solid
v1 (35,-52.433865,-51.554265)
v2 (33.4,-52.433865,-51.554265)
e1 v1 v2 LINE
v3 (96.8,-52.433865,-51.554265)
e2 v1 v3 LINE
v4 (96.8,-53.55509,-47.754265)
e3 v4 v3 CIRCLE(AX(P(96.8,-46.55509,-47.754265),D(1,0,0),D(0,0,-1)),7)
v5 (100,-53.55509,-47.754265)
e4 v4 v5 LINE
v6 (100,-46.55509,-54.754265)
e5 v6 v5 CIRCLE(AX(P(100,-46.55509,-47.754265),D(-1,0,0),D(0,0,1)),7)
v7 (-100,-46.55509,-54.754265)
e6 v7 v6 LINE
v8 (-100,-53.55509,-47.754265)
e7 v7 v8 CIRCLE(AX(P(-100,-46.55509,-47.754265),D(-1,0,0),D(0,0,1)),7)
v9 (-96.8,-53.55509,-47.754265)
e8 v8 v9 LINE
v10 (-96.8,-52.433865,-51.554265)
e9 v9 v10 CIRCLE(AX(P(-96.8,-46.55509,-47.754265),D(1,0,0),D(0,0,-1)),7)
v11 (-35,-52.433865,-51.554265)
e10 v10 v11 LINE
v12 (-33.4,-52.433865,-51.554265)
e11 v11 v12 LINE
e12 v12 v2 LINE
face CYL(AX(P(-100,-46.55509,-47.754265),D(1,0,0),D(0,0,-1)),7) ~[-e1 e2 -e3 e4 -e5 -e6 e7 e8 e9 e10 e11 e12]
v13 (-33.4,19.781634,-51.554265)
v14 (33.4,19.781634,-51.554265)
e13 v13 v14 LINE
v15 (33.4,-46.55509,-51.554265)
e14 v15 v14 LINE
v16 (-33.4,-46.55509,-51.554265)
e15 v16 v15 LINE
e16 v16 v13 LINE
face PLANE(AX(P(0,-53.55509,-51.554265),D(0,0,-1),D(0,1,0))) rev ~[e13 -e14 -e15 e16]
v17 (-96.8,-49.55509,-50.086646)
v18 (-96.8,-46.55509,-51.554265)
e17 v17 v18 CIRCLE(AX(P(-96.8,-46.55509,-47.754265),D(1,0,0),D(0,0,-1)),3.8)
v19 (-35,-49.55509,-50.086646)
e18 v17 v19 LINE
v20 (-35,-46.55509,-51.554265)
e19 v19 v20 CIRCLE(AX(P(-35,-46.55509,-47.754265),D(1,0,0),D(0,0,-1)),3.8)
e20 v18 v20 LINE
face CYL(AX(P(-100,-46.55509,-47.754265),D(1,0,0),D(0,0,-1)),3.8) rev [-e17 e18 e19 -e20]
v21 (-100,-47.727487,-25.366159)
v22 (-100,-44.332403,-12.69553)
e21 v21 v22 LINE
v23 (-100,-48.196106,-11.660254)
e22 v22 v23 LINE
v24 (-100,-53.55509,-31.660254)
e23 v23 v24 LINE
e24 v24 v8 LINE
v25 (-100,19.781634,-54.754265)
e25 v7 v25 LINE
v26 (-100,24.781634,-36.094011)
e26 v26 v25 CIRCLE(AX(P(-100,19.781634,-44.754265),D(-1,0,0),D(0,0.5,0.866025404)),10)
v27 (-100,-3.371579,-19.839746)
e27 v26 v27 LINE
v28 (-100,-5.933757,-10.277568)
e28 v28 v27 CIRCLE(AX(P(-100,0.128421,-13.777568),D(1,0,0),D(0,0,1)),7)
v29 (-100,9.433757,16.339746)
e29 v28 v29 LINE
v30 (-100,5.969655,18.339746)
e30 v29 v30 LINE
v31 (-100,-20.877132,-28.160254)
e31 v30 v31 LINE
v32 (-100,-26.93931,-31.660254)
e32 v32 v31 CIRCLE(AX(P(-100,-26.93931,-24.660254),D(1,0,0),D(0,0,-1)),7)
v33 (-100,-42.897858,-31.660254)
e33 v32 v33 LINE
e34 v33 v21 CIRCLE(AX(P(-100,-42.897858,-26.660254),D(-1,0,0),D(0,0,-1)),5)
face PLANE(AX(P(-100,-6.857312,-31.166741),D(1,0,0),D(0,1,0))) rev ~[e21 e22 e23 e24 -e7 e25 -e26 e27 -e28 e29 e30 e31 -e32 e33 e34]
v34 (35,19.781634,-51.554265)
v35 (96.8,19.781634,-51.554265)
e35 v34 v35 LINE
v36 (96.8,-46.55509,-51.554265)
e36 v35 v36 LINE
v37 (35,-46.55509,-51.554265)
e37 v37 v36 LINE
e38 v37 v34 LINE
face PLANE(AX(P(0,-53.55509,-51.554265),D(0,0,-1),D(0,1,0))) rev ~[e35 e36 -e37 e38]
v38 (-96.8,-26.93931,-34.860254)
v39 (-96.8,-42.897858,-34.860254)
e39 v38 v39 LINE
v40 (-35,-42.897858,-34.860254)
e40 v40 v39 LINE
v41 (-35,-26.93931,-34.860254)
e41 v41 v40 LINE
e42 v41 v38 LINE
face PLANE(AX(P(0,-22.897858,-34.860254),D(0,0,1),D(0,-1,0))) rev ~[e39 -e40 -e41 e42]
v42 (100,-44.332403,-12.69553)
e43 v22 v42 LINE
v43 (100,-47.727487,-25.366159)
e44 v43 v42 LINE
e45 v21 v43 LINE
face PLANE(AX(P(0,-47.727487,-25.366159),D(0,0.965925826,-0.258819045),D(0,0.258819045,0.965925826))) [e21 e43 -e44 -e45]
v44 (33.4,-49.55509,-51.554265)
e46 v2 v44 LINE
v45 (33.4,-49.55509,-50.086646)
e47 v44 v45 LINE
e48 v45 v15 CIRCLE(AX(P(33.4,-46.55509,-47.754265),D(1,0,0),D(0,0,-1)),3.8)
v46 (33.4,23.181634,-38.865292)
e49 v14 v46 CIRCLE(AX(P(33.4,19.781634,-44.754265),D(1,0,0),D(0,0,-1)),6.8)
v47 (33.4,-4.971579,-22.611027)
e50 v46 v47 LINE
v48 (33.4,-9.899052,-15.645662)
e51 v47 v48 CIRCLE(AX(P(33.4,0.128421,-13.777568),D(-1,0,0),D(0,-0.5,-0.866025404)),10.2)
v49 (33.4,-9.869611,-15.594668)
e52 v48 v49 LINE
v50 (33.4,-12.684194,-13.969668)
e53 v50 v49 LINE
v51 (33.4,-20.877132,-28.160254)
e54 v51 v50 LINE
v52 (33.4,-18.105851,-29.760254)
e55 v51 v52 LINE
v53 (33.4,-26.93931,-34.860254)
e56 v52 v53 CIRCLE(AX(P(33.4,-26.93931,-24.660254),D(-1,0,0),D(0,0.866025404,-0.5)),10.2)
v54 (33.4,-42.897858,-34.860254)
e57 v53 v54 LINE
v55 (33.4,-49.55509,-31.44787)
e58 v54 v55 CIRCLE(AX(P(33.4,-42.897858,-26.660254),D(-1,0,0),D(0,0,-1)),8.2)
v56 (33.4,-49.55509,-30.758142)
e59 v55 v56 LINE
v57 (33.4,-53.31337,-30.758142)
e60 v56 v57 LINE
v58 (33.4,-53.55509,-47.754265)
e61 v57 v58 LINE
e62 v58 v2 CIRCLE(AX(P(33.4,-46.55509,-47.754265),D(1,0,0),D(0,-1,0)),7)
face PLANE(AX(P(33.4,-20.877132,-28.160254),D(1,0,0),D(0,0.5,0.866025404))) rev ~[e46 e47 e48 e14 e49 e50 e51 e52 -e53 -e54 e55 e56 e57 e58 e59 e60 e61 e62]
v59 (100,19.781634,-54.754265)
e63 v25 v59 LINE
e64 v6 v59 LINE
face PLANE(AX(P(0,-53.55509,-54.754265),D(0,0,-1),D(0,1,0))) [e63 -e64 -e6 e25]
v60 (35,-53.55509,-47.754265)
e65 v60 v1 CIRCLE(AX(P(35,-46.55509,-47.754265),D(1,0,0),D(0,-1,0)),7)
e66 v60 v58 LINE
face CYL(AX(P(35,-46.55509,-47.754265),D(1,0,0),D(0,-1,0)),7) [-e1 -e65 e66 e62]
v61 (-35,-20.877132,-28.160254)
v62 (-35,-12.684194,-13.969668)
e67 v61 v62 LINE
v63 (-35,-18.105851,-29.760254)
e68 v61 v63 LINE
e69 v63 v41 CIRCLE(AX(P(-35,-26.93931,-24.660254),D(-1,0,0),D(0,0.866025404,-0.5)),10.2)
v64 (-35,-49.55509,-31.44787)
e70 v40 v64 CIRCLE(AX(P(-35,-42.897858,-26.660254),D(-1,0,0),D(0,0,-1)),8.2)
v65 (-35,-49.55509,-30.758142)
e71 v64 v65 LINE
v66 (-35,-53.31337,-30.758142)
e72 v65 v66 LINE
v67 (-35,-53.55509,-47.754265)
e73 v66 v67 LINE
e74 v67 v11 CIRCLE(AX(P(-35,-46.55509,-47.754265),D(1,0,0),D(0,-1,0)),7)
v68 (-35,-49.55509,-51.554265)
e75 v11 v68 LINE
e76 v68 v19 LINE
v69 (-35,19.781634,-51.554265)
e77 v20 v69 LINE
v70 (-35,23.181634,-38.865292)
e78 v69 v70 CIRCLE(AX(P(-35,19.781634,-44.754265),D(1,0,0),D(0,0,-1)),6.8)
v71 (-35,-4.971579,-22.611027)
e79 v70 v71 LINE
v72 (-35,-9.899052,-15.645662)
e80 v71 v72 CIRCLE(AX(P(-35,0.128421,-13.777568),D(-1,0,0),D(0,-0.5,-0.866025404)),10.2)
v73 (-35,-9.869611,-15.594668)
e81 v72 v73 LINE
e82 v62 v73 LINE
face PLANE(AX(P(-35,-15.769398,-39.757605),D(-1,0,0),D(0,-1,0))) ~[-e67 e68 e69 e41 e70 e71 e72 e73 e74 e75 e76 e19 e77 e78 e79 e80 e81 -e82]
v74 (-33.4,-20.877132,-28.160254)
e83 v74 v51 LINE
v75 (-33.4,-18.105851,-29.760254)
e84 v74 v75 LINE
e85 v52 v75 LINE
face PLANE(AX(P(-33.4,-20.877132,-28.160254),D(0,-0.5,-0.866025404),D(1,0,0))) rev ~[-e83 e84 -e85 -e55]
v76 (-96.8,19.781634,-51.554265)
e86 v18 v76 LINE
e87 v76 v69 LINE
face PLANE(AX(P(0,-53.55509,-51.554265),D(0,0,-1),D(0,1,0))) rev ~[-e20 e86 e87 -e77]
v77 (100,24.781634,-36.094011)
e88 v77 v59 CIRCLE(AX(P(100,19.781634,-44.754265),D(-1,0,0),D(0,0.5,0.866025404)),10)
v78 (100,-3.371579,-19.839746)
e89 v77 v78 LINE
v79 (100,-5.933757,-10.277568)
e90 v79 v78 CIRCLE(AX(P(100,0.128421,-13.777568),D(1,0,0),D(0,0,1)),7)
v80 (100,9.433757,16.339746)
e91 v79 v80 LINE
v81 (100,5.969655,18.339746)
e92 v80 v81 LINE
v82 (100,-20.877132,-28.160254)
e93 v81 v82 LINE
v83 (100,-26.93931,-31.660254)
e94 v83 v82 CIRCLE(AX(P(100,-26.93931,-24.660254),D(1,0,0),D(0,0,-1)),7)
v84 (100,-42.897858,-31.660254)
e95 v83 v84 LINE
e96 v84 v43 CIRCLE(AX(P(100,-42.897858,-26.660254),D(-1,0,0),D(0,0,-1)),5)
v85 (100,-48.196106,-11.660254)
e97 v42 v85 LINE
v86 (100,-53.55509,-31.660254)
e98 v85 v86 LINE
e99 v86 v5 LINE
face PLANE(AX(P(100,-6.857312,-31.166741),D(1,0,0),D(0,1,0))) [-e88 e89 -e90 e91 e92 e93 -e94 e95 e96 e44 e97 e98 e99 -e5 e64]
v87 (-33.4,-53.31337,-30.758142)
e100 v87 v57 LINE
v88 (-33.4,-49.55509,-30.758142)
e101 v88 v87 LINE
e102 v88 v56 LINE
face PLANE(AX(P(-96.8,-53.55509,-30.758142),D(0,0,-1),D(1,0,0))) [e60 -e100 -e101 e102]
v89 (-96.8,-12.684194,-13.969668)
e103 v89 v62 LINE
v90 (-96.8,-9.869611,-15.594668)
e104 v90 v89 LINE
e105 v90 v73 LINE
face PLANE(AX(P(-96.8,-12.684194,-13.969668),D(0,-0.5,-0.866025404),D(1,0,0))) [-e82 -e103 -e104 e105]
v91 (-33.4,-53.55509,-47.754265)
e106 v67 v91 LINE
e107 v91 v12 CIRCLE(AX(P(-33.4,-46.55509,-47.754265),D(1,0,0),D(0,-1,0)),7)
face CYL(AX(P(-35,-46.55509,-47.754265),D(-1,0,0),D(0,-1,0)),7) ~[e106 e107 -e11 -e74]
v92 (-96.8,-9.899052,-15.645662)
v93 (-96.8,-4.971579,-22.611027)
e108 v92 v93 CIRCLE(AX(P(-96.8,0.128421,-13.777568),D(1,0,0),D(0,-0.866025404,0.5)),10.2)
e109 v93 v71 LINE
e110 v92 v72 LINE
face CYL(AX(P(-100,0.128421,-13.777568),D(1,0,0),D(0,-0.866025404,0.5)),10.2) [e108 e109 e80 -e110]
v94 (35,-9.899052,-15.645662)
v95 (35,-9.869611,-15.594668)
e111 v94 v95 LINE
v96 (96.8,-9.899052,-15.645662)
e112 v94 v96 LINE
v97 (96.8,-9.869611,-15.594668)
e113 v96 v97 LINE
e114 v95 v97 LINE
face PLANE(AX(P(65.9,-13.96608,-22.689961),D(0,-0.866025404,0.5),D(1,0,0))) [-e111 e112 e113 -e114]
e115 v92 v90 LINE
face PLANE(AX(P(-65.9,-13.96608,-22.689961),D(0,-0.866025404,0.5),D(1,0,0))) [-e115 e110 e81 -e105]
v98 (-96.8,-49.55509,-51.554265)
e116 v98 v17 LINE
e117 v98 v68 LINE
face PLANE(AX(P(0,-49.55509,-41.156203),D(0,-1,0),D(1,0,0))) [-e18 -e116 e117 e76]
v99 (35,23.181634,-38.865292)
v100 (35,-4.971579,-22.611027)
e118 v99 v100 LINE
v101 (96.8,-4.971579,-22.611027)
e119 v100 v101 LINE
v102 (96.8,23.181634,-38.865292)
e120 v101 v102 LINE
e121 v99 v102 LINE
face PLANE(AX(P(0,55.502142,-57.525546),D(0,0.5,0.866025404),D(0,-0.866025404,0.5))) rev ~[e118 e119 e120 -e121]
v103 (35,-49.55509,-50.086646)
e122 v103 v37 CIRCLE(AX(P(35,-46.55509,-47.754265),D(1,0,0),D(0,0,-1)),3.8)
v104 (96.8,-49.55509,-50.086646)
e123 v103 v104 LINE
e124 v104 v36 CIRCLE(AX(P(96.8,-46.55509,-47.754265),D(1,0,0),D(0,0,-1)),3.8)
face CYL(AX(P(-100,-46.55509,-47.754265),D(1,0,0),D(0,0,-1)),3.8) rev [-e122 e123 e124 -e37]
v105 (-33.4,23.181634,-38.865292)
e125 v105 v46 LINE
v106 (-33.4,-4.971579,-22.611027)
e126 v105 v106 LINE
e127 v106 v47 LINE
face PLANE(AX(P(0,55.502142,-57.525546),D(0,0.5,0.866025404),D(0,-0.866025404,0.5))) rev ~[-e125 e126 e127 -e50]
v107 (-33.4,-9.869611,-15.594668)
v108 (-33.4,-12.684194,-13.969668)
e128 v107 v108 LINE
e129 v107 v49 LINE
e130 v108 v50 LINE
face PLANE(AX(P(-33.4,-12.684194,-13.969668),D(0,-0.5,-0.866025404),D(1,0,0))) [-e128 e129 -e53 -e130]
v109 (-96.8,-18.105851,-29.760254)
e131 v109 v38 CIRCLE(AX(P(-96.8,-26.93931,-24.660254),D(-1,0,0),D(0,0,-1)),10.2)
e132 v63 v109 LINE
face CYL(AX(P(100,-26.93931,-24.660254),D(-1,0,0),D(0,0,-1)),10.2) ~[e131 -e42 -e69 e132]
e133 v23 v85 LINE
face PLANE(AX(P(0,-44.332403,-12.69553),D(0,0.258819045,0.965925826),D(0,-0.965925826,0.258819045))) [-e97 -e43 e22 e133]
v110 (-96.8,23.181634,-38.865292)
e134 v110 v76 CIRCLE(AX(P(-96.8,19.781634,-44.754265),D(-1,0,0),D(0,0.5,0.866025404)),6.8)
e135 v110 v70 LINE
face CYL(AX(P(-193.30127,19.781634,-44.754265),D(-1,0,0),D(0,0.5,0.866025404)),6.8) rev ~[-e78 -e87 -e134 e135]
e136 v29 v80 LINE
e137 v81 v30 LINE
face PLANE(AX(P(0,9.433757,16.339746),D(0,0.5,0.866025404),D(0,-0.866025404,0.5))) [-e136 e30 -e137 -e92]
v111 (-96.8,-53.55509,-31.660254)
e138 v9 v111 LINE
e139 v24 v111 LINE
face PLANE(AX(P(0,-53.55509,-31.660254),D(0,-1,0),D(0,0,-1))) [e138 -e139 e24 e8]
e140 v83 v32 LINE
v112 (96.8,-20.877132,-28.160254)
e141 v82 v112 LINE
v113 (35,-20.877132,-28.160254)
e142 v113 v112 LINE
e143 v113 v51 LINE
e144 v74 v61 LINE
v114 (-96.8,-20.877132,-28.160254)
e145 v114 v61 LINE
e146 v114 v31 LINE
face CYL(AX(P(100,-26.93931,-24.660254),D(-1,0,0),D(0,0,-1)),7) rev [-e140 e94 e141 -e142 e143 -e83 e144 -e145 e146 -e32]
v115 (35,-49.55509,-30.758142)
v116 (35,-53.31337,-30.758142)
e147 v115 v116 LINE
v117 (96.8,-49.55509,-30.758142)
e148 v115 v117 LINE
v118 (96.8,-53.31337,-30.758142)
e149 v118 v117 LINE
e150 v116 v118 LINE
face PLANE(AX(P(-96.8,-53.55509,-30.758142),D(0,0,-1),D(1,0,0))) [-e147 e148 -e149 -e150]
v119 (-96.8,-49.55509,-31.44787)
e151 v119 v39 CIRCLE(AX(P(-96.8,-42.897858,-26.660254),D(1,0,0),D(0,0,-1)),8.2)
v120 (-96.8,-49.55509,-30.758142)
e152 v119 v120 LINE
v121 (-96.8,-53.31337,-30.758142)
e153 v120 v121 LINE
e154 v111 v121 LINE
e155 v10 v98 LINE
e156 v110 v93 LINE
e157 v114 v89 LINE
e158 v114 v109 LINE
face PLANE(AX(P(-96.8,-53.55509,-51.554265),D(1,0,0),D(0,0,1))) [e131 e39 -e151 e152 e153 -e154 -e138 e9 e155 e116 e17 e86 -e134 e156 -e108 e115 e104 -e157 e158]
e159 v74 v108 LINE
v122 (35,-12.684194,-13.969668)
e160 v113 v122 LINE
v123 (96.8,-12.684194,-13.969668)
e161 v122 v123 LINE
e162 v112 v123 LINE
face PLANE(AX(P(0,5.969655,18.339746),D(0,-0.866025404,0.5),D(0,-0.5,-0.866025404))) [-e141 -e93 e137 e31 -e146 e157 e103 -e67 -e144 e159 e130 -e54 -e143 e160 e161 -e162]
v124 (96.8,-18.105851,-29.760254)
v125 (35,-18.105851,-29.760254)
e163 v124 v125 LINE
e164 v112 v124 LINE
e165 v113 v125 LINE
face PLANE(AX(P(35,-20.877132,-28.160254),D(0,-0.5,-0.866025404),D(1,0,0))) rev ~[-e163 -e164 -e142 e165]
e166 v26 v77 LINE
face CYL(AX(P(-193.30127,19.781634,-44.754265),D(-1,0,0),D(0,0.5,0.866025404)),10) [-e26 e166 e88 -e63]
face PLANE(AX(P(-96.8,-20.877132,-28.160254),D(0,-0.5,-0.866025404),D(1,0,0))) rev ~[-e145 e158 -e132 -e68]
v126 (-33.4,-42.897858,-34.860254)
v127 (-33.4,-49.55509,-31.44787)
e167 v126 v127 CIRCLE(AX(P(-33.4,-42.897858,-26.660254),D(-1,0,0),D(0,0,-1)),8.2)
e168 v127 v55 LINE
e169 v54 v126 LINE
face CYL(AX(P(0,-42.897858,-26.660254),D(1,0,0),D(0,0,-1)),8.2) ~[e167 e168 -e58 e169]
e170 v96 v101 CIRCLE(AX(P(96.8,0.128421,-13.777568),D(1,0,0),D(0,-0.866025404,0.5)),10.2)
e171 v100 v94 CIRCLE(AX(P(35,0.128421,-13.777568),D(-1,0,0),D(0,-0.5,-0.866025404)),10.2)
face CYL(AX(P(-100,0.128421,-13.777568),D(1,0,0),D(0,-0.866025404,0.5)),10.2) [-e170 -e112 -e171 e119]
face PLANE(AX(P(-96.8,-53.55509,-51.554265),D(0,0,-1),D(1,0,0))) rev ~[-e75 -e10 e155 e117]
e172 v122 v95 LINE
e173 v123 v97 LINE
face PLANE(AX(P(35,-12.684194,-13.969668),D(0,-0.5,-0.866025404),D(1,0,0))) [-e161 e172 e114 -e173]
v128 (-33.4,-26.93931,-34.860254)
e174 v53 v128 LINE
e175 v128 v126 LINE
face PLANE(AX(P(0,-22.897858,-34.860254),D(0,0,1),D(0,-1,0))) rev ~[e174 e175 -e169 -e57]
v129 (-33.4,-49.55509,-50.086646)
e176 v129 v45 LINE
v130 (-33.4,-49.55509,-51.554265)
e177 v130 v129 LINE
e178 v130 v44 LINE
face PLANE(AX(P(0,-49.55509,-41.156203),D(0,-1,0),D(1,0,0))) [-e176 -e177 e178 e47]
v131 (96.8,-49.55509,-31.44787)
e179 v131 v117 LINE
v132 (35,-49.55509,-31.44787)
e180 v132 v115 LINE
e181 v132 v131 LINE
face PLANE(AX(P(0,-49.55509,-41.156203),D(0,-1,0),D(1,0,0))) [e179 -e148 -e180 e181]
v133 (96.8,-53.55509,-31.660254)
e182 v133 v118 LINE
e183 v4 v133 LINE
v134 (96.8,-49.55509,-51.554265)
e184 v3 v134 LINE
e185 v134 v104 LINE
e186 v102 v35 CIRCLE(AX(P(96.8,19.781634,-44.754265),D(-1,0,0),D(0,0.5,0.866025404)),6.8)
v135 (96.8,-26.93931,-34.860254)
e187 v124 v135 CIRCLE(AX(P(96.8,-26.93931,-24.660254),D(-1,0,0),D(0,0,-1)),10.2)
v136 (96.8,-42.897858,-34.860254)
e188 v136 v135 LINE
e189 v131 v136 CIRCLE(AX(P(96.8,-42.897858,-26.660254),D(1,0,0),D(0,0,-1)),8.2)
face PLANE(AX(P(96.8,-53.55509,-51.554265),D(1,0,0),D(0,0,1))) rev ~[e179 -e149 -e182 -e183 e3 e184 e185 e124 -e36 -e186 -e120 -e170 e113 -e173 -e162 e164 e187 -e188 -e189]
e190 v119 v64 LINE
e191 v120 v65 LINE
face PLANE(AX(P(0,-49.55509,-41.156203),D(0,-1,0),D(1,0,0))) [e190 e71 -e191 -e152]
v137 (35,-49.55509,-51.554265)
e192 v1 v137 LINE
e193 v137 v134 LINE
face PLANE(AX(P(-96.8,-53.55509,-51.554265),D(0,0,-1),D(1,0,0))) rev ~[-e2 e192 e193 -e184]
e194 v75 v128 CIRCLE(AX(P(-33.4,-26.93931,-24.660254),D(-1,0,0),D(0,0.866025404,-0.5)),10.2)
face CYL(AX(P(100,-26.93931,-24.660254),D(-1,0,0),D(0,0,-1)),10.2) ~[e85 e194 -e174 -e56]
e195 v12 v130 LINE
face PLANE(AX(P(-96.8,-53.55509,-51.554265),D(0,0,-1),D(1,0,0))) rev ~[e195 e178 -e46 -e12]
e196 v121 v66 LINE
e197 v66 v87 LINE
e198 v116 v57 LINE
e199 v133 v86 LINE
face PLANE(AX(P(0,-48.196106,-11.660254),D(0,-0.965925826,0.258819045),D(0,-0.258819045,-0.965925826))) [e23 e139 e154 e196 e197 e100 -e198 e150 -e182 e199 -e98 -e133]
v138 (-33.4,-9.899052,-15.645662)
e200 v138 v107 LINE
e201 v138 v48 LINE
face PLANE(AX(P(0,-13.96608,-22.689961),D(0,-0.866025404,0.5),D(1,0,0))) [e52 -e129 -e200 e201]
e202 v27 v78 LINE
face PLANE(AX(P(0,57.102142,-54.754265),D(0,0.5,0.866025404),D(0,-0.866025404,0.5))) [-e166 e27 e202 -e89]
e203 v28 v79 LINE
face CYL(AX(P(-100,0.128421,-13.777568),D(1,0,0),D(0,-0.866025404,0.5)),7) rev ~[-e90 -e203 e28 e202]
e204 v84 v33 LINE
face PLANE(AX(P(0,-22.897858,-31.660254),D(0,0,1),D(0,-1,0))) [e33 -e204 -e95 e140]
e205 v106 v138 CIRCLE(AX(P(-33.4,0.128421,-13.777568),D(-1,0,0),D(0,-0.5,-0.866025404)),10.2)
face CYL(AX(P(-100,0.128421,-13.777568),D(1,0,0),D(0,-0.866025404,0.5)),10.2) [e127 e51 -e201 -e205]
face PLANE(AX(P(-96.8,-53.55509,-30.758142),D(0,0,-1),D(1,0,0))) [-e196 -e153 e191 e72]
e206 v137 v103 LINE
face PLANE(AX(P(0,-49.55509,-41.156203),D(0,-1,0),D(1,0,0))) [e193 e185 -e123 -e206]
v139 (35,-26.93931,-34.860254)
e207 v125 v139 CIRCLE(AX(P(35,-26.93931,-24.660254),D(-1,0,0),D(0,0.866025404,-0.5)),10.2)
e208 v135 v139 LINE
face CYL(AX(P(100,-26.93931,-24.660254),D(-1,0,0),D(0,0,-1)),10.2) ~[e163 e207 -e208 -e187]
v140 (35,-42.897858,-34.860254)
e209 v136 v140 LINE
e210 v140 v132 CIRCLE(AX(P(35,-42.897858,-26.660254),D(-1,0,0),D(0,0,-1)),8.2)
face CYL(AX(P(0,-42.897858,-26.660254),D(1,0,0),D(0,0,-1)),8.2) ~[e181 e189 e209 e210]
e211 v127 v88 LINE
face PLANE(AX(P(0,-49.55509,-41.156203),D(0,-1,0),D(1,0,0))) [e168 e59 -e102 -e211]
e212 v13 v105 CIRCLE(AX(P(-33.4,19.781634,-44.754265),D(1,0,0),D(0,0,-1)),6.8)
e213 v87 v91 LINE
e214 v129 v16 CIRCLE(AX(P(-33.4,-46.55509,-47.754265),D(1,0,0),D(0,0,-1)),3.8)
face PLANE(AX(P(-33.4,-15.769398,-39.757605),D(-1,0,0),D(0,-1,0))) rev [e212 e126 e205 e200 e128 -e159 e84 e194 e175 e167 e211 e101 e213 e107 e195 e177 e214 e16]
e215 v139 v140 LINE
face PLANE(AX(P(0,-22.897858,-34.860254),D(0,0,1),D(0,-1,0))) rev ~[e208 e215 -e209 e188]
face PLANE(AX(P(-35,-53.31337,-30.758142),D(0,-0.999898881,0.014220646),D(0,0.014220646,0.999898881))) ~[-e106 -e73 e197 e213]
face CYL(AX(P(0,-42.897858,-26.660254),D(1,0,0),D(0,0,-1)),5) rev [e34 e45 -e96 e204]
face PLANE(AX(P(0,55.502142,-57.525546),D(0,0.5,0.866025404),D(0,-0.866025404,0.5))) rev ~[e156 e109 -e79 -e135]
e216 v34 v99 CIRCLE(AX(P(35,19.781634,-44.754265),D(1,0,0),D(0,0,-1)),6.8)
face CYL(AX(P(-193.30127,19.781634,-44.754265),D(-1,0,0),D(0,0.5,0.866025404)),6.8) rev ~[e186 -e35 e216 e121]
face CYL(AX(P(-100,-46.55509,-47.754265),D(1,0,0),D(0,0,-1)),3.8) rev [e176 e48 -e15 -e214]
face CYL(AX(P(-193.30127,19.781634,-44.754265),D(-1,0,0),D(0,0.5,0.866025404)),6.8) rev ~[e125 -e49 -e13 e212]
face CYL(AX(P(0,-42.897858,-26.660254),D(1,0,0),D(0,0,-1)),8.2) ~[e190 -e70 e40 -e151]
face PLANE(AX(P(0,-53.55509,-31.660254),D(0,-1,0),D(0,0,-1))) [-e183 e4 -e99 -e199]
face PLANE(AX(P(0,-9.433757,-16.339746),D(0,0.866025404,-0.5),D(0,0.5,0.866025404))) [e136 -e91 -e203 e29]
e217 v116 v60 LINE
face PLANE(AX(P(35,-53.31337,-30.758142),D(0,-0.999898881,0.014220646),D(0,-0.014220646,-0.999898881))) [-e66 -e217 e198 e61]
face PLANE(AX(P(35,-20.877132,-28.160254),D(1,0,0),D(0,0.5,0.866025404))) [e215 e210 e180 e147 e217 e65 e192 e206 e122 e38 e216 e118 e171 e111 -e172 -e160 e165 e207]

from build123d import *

# Parameters (mm, degrees)
F1_DEPTH    = 100
F2_R        = 7
F3_T1_DEPTH = 386.6025403784
F4_T        = -3.2
F5_W        = 193.6
F5_H        = 20.7961232061
F6_DEPTH    = 4
F9_DEPTH    = 1.6
F10_W       = 61.8
F10_H       = 16.3858774256
F10_W_2     = 66.8
F11_DEPTH   = 3.25


# Not quite as in the source:
# - a fillet or chamfer that OpenCascade refuses, or shapes differently, is made with other operations: its cross-section is extruded or revolved along the edge and cut away or added
# - a pattern or mirror of a feature is missing from the dataset's text; its kind, count and spacing are read off the source's solid


with BuildPart() as f1:
    # F0 (on Right) → F1 (new body, symmetric)
    with BuildSketch(Plane.YZ):
        with BuildLine():
            ThreePointArc((-42.8978583449, -31.6602540378), (-46.8646250463, -29.7040611829), (-47.7274874763, -25.3661588123))
            Line((-47.7274874763, -25.3661588123), (-44.3324027769, -12.6955302183))
            Line((-44.3324027769, -12.6955302183), (-48.1961060821, -11.6602540378))
            Line((-48.1961060821, -11.6602540378), (-53.5550899307, -31.6602540378))
            Line((-53.5550899307, -31.6602540378), (-53.5550899307, -54.7542648054))
            Line((-53.5550899307, -54.7542648054), (57.1021416551, -54.7542648054))
            Line((57.1021416551, -54.7542648054), (-9.4337567297, -16.3397459622))
            Line((-9.4337567297, -16.3397459622), (9.4337567297, 16.3397459622))
            Line((9.4337567297, 16.3397459622), (5.9696551146, 18.3397459622))
            Line((5.9696551146, 18.3397459622), (-22.8978583449, -31.6602540378))
            Line((-22.8978583449, -31.6602540378), (-42.8978583449, -31.6602540378))
        make_face()
    extrude(amount=F1_DEPTH, both=True)

    # F2
    f2_edges = [f1.edges().sort_by_distance(p)[0] for p in [
        (0, -53.55509, -54.754265),
        (0, -9.433757, -16.339746),
        (0, -22.897858, -31.660254),
    ]]
    fillet(f2_edges, radius=F2_R)

    # F3: fillet of radius 10 on 1 edges, made by hand

    # F3_s2 → F3_t1 (cut)
    with BuildSketch(Plane.YZ.offset(-193.3012701892)):
        with BuildLine():
            ThreePointArc((24.7816335794, -36.0940107676), (29.4408918423, -47.3424552565), (19.7816335794, -54.7542648054))
            Line((19.7816335794, -54.7542648054), (57.1021416551, -54.7542648054))
            Line((57.1021416551, -54.7542648054), (24.7816335794, -36.0940107676))
        make_face()
    extrude(amount=F3_T1_DEPTH, mode=Mode.SUBTRACT)

    # F4 (hollow: no face is removed)
    offset(amount=F4_T, mode=Mode.SUBTRACT)

    # F5 (on face) → F6 (cut)
    with BuildSketch(Plane.XZ.offset(53.5550899307)):
        with Locations((0, -41.1562032024)):
            Rectangle(F5_W, F5_H)
    extrude(amount=-F6_DEPTH, mode=Mode.SUBTRACT)

    # F8 (on offset) → F9 (join)
    with BuildSketch(Plane.YZ.offset(35)):
        with BuildLine():
            Line((-49.5550899307, -31.4478701056), (-49.5550899307, -30.7581415993))
            Line((-49.5550899307, -30.7581415993), (-53.3133696313, -30.7581415993))
            Line((-53.3133696313, -30.7581415993), (-53.5550899307, -47.7542648054))
            ThreePointArc((-53.5550899307, -47.7542648054), (-53.2689348678, -49.735245916), (-52.4338653134, -51.5542648054))
            Line((-52.4338653134, -51.5542648054), (-46.5550899307, -51.5542648054))
            Line((-46.5550899307, -51.5542648054), (19.7816335794, -51.5542648054))
            ThreePointArc((19.7816335794, -51.5542648054), (26.3499291982, -46.5142343121), (23.1816335794, -38.8652920597))
            Line((23.1816335794, -38.8652920597), (-4.9715789032, -22.6110272543))
            ThreePointArc((-4.9715789032, -22.6110272543), (-8.2208411642, -19.6367335794), (-9.9129123978, -15.569667924))
            Line((-9.9129123978, -15.569667924), (-18.1058511106, -29.7602540378))
            ThreePointArc((-18.1058511106, -29.7602540378), (-21.8393102292, -33.4937131564), (-26.9393102292, -34.8602540378))
            Line((-26.9393102292, -34.8602540378), (-42.8978583449, -34.8602540378))
            ThreePointArc((-42.8978583449, -34.8602540378), (-46.6382826687, -33.9574607553), (-49.5550899307, -31.4478701056))
        make_face()
    f9 = extrude(amount=-F9_DEPTH)

    # F9_copies: F9 across plane
    add(f9.mirror(Plane(origin=(0, 0, 0), x_dir=(0, 0, -1), z_dir=(-1, 0, 0))))

    # F10 (on face) → F11 (cut)
    with BuildSketch(Plane(origin=(0, -3.4641016151, 2), x_dir=(1, 0, 0), z_dir=(0, -0.8660254038, 0.5))):
        with Locations((-65.9, -26.6331228623)):
            Rectangle(F10_W, F10_H)
        with Locations((0, -26.6331228623)):
            Rectangle(F10_W_2, F10_H)
        with Locations((65.9, -26.6331228623)):
            Rectangle(F10_W, F10_H)
    extrude(amount=-F11_DEPTH, mode=Mode.SUBTRACT)


solid = f1.part
